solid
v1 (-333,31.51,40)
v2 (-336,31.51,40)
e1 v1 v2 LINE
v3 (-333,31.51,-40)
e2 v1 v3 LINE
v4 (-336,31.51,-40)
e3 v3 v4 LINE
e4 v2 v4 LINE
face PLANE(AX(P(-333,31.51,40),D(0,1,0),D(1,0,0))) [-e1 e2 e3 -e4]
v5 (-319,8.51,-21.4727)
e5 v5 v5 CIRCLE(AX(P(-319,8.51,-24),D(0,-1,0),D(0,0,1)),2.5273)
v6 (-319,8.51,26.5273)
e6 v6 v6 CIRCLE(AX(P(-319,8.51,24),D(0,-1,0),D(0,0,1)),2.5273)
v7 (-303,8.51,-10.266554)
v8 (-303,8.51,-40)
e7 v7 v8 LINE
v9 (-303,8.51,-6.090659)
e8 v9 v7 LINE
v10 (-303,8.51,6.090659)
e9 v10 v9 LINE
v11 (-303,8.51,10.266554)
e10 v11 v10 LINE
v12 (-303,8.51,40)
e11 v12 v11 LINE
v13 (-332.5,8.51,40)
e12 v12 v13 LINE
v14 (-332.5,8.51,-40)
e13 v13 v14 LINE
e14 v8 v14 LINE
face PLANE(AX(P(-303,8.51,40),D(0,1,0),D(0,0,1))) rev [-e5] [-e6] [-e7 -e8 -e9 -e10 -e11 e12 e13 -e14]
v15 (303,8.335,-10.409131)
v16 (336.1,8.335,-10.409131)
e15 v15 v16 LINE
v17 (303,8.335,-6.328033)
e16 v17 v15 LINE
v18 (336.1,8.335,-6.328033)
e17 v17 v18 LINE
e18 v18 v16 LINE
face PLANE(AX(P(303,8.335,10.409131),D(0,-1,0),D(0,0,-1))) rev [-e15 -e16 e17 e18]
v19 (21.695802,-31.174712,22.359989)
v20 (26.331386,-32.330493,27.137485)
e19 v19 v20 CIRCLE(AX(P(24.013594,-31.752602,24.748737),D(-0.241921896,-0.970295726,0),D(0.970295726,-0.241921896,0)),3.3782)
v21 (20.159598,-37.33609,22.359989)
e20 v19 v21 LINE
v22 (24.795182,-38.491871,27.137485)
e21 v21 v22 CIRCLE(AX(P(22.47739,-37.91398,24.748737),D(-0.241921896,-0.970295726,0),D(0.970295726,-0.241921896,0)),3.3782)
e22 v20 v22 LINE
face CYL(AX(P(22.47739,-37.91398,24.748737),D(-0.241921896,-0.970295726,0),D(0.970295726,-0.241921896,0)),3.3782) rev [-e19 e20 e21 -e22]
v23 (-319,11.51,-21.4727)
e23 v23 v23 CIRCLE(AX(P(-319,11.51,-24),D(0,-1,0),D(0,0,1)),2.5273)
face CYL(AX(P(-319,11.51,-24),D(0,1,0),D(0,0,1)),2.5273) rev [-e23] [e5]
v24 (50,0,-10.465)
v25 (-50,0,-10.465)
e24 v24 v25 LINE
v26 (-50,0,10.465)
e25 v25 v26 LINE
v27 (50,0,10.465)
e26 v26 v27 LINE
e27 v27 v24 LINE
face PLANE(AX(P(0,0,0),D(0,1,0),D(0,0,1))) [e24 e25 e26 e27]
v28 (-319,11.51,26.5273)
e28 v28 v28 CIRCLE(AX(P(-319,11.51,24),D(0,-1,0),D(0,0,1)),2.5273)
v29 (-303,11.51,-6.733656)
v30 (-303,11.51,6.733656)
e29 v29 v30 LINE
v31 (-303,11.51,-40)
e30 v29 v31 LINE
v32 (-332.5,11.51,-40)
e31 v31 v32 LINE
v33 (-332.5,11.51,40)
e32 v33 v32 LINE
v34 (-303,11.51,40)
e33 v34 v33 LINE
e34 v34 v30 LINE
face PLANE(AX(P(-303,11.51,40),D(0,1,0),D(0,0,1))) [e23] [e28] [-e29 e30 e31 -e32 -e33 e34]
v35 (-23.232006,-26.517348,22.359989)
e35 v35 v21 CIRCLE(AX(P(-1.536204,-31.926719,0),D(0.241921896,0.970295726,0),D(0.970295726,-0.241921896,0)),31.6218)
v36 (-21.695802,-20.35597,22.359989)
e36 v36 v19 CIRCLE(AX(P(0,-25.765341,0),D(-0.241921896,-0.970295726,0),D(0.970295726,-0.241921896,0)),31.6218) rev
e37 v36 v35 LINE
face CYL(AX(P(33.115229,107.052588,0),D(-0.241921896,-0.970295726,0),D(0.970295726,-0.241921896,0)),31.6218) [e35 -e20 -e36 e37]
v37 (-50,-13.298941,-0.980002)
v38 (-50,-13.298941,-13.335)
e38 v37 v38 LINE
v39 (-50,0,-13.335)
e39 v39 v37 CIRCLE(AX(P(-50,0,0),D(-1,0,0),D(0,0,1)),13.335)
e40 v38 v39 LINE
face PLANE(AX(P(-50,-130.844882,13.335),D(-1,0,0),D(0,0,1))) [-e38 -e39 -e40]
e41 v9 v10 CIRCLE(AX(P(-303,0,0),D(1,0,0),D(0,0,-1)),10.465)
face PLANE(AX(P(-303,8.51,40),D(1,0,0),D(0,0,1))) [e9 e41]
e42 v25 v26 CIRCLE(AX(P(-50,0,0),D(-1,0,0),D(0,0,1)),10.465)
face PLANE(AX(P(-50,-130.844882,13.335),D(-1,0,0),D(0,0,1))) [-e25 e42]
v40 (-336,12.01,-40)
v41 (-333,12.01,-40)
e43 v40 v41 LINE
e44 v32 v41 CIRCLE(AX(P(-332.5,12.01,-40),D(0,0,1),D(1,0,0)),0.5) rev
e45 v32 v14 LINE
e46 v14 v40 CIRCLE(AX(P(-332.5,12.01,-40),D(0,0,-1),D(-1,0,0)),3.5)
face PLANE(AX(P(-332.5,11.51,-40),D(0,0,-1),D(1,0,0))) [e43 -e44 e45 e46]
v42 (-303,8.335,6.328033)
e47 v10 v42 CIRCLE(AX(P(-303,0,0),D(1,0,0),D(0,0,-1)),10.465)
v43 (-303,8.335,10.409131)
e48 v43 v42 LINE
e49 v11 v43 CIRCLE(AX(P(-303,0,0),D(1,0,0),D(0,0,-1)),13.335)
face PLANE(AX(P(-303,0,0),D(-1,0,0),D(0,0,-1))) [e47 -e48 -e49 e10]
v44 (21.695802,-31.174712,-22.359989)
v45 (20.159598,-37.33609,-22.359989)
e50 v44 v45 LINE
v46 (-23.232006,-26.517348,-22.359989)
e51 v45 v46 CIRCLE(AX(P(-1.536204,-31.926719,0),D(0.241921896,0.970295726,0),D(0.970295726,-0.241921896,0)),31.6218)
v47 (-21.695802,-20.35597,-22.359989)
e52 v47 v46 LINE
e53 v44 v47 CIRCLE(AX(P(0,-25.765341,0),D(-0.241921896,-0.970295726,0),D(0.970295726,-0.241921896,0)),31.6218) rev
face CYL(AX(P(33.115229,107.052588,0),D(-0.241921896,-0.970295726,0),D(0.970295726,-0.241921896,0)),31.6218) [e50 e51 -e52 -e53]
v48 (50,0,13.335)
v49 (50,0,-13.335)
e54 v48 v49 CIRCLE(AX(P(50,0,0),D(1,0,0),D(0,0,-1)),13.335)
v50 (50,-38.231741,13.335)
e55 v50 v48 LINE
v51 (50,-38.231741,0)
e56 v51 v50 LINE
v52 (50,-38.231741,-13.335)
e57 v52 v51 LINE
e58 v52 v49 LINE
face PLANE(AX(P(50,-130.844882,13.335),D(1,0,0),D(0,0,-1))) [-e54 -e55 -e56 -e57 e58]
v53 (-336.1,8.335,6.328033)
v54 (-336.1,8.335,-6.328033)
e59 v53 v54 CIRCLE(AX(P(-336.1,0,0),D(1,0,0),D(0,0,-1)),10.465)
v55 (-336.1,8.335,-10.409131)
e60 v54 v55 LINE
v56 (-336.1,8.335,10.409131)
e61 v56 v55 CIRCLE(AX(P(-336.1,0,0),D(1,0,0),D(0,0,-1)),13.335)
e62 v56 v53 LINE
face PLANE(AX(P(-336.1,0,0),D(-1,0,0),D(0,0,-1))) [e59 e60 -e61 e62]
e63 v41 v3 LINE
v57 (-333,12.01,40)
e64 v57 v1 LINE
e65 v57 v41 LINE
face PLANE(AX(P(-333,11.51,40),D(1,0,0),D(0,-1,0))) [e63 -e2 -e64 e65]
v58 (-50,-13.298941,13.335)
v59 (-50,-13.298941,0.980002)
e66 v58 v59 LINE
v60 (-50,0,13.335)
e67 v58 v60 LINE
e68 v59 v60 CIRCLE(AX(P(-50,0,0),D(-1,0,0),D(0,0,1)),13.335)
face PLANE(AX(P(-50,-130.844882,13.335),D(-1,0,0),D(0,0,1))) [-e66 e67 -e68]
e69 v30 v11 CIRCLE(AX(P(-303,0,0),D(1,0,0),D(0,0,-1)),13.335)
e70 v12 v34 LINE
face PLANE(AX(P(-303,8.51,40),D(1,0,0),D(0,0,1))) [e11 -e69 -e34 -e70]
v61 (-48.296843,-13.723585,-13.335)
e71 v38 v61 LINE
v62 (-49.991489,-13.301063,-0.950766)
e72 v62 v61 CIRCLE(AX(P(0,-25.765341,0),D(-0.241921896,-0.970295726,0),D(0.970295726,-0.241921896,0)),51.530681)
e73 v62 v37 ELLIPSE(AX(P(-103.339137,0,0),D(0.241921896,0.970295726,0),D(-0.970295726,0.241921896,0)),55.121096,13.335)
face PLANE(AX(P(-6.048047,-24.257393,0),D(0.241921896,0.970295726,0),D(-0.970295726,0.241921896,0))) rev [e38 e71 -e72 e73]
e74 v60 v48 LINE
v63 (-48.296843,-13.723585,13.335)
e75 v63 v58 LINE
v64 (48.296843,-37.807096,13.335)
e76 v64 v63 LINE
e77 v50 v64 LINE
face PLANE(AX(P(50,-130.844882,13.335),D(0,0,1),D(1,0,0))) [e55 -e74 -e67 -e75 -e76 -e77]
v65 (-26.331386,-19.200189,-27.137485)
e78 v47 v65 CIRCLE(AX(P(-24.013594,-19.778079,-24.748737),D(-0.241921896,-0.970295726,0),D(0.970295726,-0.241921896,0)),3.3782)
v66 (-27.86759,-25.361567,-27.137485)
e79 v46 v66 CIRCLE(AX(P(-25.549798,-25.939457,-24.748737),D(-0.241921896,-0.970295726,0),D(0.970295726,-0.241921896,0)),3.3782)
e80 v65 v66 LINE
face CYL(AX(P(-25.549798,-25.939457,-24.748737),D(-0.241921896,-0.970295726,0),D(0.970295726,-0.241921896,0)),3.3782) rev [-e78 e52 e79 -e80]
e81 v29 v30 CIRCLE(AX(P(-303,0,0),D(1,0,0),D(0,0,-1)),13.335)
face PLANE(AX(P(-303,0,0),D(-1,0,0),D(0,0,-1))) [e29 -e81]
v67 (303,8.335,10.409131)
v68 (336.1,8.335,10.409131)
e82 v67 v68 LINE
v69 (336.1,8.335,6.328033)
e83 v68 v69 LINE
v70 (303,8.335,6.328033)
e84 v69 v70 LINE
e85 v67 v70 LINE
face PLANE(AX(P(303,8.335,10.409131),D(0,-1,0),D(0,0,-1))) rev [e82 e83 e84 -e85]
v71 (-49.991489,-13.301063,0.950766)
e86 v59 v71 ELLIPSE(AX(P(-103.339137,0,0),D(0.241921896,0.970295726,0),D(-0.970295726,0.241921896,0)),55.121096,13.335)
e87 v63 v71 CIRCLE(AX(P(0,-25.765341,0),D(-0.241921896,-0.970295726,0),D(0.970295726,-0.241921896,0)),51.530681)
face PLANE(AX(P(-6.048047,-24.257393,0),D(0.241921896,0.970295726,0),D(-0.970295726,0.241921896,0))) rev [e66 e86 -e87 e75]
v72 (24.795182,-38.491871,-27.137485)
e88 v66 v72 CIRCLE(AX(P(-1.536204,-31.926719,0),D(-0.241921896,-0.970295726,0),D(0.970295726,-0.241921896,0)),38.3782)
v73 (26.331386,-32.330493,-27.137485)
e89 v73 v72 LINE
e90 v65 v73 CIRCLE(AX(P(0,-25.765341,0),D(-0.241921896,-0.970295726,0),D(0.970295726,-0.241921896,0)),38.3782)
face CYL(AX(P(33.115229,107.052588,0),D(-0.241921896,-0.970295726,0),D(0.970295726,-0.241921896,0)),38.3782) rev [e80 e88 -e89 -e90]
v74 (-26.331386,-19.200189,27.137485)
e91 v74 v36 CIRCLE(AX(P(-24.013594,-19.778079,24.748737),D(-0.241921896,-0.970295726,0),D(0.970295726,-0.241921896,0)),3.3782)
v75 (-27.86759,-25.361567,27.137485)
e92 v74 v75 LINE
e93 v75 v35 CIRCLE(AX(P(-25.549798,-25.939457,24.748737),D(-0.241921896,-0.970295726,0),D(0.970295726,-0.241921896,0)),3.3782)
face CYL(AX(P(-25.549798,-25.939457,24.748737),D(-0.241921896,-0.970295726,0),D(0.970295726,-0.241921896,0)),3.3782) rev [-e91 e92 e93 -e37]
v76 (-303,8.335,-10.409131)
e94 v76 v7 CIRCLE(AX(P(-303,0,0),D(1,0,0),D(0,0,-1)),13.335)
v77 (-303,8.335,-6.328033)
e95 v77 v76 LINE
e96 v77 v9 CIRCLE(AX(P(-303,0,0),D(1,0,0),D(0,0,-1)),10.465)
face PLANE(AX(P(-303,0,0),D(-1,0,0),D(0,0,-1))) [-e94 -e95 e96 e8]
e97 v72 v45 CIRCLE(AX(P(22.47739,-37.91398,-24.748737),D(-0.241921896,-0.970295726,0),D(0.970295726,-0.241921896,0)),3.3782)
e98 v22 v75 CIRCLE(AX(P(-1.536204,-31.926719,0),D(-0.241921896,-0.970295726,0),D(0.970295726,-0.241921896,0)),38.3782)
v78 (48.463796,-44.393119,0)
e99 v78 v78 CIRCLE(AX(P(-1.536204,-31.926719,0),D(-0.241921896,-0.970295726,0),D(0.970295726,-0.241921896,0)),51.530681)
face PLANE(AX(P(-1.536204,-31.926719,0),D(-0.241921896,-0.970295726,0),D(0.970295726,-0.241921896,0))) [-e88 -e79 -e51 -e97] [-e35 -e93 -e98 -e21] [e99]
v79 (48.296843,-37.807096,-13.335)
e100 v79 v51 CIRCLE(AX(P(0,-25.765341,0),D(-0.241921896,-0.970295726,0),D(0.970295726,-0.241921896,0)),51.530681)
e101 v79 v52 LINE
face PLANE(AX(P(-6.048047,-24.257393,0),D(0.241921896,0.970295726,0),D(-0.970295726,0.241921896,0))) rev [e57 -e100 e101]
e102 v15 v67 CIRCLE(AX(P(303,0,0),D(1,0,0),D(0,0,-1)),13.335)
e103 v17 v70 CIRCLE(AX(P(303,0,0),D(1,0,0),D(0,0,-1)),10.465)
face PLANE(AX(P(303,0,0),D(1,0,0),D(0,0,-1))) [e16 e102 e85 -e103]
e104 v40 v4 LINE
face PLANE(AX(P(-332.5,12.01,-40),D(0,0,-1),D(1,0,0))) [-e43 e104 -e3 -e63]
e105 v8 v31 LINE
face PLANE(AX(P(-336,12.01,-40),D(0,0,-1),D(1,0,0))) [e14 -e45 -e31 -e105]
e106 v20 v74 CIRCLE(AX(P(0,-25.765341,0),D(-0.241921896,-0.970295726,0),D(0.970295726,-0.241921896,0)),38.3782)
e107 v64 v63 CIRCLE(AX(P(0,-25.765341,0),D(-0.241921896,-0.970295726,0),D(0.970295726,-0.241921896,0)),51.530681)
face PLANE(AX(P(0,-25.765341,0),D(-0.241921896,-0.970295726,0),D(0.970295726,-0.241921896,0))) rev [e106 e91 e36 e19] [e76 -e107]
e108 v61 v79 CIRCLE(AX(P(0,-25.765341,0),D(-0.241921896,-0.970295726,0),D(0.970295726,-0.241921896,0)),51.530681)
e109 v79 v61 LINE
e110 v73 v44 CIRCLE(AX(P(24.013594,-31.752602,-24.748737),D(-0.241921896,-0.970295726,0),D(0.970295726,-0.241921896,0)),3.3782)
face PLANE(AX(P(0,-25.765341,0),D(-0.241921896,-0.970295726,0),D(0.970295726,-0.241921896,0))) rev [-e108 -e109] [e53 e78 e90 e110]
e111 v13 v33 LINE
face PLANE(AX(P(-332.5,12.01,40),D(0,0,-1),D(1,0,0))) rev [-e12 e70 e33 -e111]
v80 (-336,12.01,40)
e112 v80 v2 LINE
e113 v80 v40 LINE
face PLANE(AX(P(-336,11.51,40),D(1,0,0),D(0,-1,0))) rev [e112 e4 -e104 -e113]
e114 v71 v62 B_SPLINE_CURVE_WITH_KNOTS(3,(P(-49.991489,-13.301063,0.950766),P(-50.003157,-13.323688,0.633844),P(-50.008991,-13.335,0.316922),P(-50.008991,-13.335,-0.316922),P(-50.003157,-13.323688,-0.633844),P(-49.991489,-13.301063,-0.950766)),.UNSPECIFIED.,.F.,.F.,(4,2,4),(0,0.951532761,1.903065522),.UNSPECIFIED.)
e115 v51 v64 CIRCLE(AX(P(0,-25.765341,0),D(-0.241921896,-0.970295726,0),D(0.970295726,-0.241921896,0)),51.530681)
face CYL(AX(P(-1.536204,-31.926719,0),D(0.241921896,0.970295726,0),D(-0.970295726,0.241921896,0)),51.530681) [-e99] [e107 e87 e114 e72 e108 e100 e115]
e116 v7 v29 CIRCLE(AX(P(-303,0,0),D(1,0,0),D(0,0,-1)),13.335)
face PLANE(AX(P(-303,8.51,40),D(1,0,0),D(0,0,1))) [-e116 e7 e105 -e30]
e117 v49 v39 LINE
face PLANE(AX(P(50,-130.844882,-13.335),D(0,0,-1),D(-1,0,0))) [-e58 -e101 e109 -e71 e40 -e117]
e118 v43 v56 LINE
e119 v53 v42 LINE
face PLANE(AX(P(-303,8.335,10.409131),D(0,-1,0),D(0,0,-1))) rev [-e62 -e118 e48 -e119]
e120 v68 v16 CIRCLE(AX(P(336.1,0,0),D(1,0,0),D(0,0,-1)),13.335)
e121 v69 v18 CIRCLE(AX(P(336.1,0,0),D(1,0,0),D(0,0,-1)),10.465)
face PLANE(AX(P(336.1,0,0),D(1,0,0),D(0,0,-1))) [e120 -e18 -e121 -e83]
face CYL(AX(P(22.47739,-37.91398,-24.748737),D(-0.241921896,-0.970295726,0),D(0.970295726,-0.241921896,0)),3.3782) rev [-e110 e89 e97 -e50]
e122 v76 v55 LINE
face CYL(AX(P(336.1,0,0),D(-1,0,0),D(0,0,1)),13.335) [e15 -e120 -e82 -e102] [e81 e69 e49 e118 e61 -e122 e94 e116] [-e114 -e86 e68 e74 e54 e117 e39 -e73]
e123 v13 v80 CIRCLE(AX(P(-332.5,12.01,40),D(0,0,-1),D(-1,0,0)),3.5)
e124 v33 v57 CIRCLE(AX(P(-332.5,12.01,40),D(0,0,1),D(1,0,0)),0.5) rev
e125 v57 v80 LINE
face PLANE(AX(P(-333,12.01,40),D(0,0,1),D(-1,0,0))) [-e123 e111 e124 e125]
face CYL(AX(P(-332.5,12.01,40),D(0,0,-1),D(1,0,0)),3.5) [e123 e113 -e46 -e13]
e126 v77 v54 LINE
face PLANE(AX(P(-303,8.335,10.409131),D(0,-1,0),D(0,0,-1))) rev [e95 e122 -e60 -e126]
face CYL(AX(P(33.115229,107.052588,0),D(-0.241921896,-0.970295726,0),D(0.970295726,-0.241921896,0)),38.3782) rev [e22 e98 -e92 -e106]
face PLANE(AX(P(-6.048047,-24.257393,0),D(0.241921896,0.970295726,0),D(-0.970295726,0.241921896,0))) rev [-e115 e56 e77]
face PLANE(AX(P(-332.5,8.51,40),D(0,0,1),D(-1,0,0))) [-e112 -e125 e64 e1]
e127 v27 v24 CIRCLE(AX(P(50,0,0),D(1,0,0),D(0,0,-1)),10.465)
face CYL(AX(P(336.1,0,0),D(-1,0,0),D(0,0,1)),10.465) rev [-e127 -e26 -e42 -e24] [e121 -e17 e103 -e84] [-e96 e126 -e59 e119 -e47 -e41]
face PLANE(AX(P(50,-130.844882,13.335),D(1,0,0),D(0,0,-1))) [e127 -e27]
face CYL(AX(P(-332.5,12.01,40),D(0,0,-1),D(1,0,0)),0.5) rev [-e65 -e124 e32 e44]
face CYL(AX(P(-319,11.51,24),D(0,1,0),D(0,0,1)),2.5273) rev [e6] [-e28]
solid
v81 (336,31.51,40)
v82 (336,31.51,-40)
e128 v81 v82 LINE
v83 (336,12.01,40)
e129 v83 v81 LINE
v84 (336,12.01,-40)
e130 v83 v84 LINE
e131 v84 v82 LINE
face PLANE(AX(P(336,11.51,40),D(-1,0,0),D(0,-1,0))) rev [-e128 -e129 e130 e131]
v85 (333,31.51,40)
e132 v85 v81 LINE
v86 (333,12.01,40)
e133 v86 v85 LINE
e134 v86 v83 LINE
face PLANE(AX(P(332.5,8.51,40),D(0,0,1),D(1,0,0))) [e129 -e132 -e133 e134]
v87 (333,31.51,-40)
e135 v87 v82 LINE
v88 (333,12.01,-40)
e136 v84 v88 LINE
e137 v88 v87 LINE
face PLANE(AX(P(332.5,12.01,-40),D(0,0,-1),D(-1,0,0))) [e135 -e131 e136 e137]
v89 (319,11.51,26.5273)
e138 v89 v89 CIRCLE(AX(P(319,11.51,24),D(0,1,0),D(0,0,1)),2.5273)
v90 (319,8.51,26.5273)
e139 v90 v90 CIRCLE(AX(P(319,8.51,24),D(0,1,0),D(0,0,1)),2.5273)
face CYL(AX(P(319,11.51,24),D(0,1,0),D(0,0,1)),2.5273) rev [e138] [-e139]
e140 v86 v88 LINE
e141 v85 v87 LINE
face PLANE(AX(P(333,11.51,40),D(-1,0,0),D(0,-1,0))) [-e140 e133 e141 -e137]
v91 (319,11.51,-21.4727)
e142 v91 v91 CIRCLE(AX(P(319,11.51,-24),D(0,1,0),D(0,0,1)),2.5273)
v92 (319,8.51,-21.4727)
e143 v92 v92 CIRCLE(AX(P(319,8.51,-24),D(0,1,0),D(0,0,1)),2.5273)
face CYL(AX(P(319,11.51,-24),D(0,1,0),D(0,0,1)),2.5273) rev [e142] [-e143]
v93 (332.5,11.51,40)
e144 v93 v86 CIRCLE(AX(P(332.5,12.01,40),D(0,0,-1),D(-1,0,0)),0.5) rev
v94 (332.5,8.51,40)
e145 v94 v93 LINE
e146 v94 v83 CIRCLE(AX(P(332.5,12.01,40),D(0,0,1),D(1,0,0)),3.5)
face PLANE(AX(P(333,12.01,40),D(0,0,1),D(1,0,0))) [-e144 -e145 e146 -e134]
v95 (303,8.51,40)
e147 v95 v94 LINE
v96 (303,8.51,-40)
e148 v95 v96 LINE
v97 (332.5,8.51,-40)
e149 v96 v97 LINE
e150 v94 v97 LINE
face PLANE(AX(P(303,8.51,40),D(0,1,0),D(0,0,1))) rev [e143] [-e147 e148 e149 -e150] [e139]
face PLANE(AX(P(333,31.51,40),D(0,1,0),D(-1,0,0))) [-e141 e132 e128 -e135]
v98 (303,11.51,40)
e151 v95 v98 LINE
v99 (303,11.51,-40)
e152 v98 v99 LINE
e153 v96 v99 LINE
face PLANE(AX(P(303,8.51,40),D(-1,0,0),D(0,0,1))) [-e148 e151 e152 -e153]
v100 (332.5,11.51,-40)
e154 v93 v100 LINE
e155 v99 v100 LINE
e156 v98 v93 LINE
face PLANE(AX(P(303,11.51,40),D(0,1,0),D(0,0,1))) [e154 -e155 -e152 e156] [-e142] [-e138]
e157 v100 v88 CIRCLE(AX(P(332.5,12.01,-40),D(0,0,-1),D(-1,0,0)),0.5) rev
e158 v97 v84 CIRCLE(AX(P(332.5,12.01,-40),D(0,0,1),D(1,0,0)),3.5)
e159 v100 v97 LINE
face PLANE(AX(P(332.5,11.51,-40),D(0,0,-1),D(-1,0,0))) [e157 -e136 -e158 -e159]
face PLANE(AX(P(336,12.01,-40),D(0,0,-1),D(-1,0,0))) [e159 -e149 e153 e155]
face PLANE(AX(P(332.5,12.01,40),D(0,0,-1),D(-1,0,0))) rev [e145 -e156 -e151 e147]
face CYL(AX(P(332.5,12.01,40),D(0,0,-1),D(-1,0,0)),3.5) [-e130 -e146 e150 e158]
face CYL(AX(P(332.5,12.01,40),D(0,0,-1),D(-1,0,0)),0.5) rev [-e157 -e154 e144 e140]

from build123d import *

# Parameters (mm, degrees)
SKETCH1_R                           = 13.335
SKETCH1_R_2                         = 10.465
BOSS_EXTRUDE1_DEPTH                 = 336.1
CUT_EXTRUDE3_START                  = -33.1
CUT_EXTRUDE3_DEPTH                  = 33.1
BASE_FLANGE2_DEPTH                  = 40
BASE_FLANGE2_DEPTH_BACK             = 40
SKETCH36_W                          = 2.5273
SKETCH36_H                          = 50
F_8_0_199_DIAMETER_HOLE4_AT_2_COUNT = 2
F_8_0_199_DIAMETER_HOLE4_AT_2_PITCH = 48
MIRROR5_START                       = -303
MIRROR5_OUTLINE_R                   = 13.335
MIRROR5_OUTLINE_R_2                 = 10.465
MIRROR5_DEPTH                       = 303
MIRROR5_START_2                     = -336.1
MIRROR5_2_DEPTH                     = 33.1
BOSS_EXTRUDE3_REACH                 = 341.935
SKETCH39_W                          = 100
SKETCH39_H                          = 26.67
SKETCH40_R                          = 51.530681467
BOSS_EXTRUDE4_DEPTH                 = 6.35
SKETCH43_W                          = 3.3782
SKETCH43_H                          = 143.233967446
F_1_4_CLEARANCE_HOLE1_AT_2_COUNT    = 2
F_1_4_CLEARANCE_HOLE1_AT_2_PITCH    = 49.497474683
F_1_4_CLEARANCE_HOLE1_AT_3_COUNT    = 2
F_1_4_CLEARANCE_HOLE1_AT_3_PITCH    = 70
F_1_4_CLEARANCE_HOLE1_AT_4_COUNT    = 2
F_1_4_CLEARANCE_HOLE1_AT_4_PITCH    = 49.497474683
F_1_4_CLEARANCE_HOLE1_AT_5_COUNT    = 2
F_1_4_CLEARANCE_HOLE1_AT_5_PITCH    = 26.787840266
F_1_4_CLEARANCE_HOLE1_AT_6_COUNT    = 2
F_1_4_CLEARANCE_HOLE1_AT_6_PITCH    = 64.671567276
CUT_EXTRUDE4_DEPTH                  = 354.000635368


# Read off the part's stored shape, not the designer's step: Mirror5
# Sheet-metal steps are written as plain solids
with BuildPart() as part:
    # Sketch1 → Boss-Extrude1 (new body)
    with BuildSketch(Plane(origin=(0, 0, 0), x_dir=(0, 0, -1), z_dir=(1, 0, 0))):
        Circle(SKETCH1_R)
        Circle(SKETCH1_R_2, mode=Mode.SUBTRACT)
    extrude(amount=BOSS_EXTRUDE1_DEPTH)

    # Sketch4 → Cut-Extrude3 (cut)
    with BuildSketch(Plane(origin=(336.1, 0, 0), x_dir=(0, 0, -1), z_dir=(1, 0, 0)).offset(CUT_EXTRUDE3_START)):
        with BuildLine():
            Line((-10.409130607, 8.335), (10.409130607, 8.335))
            ThreePointArc((10.409130607, 8.335), (0, 13.335), (-10.409130607, 8.335))
        make_face()
    extrude(amount=CUT_EXTRUDE3_DEPTH, mode=Mode.SUBTRACT)



with BuildPart() as body_2:
    # Sketch31 → Base-Flange2 (new, two sides: drawn at the far end of the back side and taken through both)
    with BuildSketch(Plane.XY.offset(-BASE_FLANGE2_DEPTH_BACK)):
        with BuildLine():
            Line((303, 11.51), (332.5, 11.51))
            ThreePointArc((332.5, 11.51), (332.853553391, 11.656446609), (333, 12.01))
            Line((333, 12.01), (333, 31.51))
            Line((333, 31.51), (336, 31.51))
            Line((336, 31.51), (336, 12.01))
            ThreePointArc((336, 12.01), (334.974873734, 9.535126266), (332.5, 8.51))
            Line((332.5, 8.51), (303, 8.51))
            Line((303, 8.51), (303, 11.51))
        make_face()
    extrude(amount=BASE_FLANGE2_DEPTH + BASE_FLANGE2_DEPTH_BACK)

    # Sketch36 → #8 (0.199) Diameter Hole4 (revolve, cut)
    with BuildSketch(Plane(origin=(319, 11.51, -24), x_dir=(0, 0, 1), z_dir=(1, 0, 0))):
        with Locations((1.26365, 25)):
            Rectangle(SKETCH36_W, SKETCH36_H)
    f_8_0_199_diameter_hole4 = revolve(axis=Axis((319, 17.86, -24), (0, -1, 0)), mode=Mode.SUBTRACT)

    # #8 (0.199) Diameter Hole4 at 2: #8 (0.199) Diameter Hole4 ×2
    with Locations(*[(0, 0, i * F_8_0_199_DIAMETER_HOLE4_AT_2_PITCH) for i in range(1, F_8_0_199_DIAMETER_HOLE4_AT_2_COUNT)]):
        add(f_8_0_199_diameter_hole4, mode=Mode.SUBTRACT)


with BuildPart() as body_3:
    # Mirror4: mirrored copy
    add(body_2.part.mirror(Plane(origin=(0, 0, 0), x_dir=(0, 0, 1), z_dir=(1, 0, 0))))


with BuildPart() as part_1:
    add(part.part)

    add(body_3.part)  # Mirror5 merges body 3
    # Mirror5 outline → Mirror5 (add)
    with BuildSketch(Plane.YZ.offset(MIRROR5_START)):
        Circle(MIRROR5_OUTLINE_R)
        Circle(MIRROR5_OUTLINE_R_2, mode=Mode.SUBTRACT)
    extrude(amount=MIRROR5_DEPTH)

    # Mirror5 2 outline → Mirror5 2 (add)
    with BuildSketch(Plane.YZ.offset(MIRROR5_START_2)):
        with BuildLine():
            Line((8.335, 6.32803287), (8.335, 10.409130607))
            ThreePointArc((8.335, 10.409130607), (-13.335, 0), (8.335, -10.409130607))
            Line((8.335, -10.409130607), (8.335, -6.32803287))
            ThreePointArc((8.335, -6.32803287), (-10.465, 0), (8.335, 6.32803287))
        make_face()
    extrude(amount=MIRROR5_2_DEPTH)

    # Boss-Extrude3: up to this plane
    boss_extrude3_end = Plane(origin=(-6.04804739, -24.257393157, 0), z_dir=(0.24192189559967145, 0.9702957262759956, 0))
    # Sketch39 → Boss-Extrude3 (add, up to the surface)
    with BuildSketch(Plane(origin=(0, 0, 0), x_dir=(1, 0, 0), z_dir=(0, 1, 0)), mode=Mode.PRIVATE) as boss_extrude3_sk1:
        Rectangle(SKETCH39_W, SKETCH39_H)
    boss_extrude3_tool1 = split(extrude(boss_extrude3_sk1.sketch, amount=-BOSS_EXTRUDE3_REACH, mode=Mode.PRIVATE), bisect_by=boss_extrude3_end, keep=Keep.BOTH, mode=Mode.PRIVATE)
    add(boss_extrude3_tool1.solids().sort_by_distance((0, 0, 0))[0])

    # Sketch40 → Boss-Extrude4 (add)
    with BuildSketch(Plane(origin=(-6.04804739, -24.257393157, 0), x_dir=(-0.9702957262759956, 0.24192189559967145, 0), z_dir=(-0.24192189559967145, -0.9702957262759956, 0))):
        with Locations(Location((-6.233200071, 0, 0), (0, 0, 180))):
            Circle(SKETCH40_R)
    extrude(amount=BOSS_EXTRUDE4_DEPTH)

    # Sketch43 → 1/4 Clearance Hole1 (revolve, cut)
    with BuildSketch(Plane(origin=(-25.54979811, -25.939457144, 24.748737342), x_dir=(0.9702957262759956, -0.24192189559967145, 0), z_dir=(0, 0, 1))):
        with Locations((1.6891, 71.616983723)):
            Rectangle(SKETCH43_W, SKETCH43_H)
    f_1_4_clearance_hole1 = revolve(axis=Axis((-27.086002147, -32.100835006, 24.748737342), (0.24192189559967142, 0.9702957262759956, 0)), mode=Mode.SUBTRACT)

    # 1/4 Clearance Hole1 at 2: 1/4 Clearance Hole1 ×2
    with Locations(*[Vector(0.9702957262759956, -0.24192189559967142, -4.076857218435412e-13) * (i * F_1_4_CLEARANCE_HOLE1_AT_2_PITCH) for i in range(1, F_1_4_CLEARANCE_HOLE1_AT_2_COUNT)]):
        add(f_1_4_clearance_hole1, mode=Mode.SUBTRACT)

    # 1/4 Clearance Hole1 at 3: 1/4 Clearance Hole1 ×2
    with Locations(*[Vector(0.6861026878060814, -0.17106461289603136, -0.7071067811865488) * (i * F_1_4_CLEARANCE_HOLE1_AT_3_PITCH) for i in range(1, F_1_4_CLEARANCE_HOLE1_AT_3_COUNT)]):
        add(f_1_4_clearance_hole1, mode=Mode.SUBTRACT)

    # 1/4 Clearance Hole1 at 4: 1/4 Clearance Hole1 ×2
    with Locations(*[(0, 0, -i * F_1_4_CLEARANCE_HOLE1_AT_4_PITCH) for i in range(1, F_1_4_CLEARANCE_HOLE1_AT_4_COUNT)]):
        add(f_1_4_clearance_hole1, mode=Mode.SUBTRACT)

    # 1/4 Clearance Hole1 at 5: 1/4 Clearance Hole1 ×2
    with Locations(*[Vector(0.8964363619897173, -0.22350668781090646, 0.3826834323647138) * (i * F_1_4_CLEARANCE_HOLE1_AT_5_PITCH) for i in range(1, F_1_4_CLEARANCE_HOLE1_AT_5_COUNT)]):
        add(f_1_4_clearance_hole1, mode=Mode.SUBTRACT)

    # 1/4 Clearance Hole1 at 6: 1/4 Clearance Hole1 ×2
    with Locations(*[Vector(0.37131609894011086, -0.09257950137226025, -0.9238795325114425) * (i * F_1_4_CLEARANCE_HOLE1_AT_6_PITCH) for i in range(1, F_1_4_CLEARANCE_HOLE1_AT_6_COUNT)]):
        add(f_1_4_clearance_hole1, mode=Mode.SUBTRACT)

    # Sketch45 → Cut-Extrude4 (cut, through all)
    with BuildSketch(Plane(origin=(-7.584251427, -30.418771019, 0), x_dir=(-0.9702957262759956, 0.24192189559967145, 0), z_dir=(-0.24192189559967145, -0.9702957262759956, 0))):
        with BuildLine():
            ThreePointArc((-33.370685541, -27.13748547), (-6.233200071, -38.3782), (20.904285399, -27.13748547))
            ThreePointArc((20.904285399, -27.13748547), (20.904285399, -22.359989213), (16.126789142, -22.359989213))
            ThreePointArc((16.126789142, -22.359989213), (-6.233200071, -31.6218), (-28.593189284, -22.359989213))
            ThreePointArc((-28.593189284, -22.359989213), (-33.370685541, -22.359989213), (-33.370685541, -27.13748547))
        make_face()
        with BuildLine():
            ThreePointArc((20.904285399, 27.13748547), (-6.233200071, 38.3782), (-33.370685541, 27.13748547))
            ThreePointArc((-33.370685541, 27.13748547), (-33.370685541, 22.359989213), (-28.593189284, 22.359989213))
            ThreePointArc((-28.593189284, 22.359989213), (-6.233200071, 31.6218), (16.126789142, 22.359989213))
            ThreePointArc((16.126789142, 22.359989213), (20.904285399, 22.359989213), (20.904285399, 27.13748547))
        make_face()
    extrude(amount=-CUT_EXTRUDE4_DEPTH, mode=Mode.SUBTRACT)


solid = Compound([body_2.part, part_1.part])
